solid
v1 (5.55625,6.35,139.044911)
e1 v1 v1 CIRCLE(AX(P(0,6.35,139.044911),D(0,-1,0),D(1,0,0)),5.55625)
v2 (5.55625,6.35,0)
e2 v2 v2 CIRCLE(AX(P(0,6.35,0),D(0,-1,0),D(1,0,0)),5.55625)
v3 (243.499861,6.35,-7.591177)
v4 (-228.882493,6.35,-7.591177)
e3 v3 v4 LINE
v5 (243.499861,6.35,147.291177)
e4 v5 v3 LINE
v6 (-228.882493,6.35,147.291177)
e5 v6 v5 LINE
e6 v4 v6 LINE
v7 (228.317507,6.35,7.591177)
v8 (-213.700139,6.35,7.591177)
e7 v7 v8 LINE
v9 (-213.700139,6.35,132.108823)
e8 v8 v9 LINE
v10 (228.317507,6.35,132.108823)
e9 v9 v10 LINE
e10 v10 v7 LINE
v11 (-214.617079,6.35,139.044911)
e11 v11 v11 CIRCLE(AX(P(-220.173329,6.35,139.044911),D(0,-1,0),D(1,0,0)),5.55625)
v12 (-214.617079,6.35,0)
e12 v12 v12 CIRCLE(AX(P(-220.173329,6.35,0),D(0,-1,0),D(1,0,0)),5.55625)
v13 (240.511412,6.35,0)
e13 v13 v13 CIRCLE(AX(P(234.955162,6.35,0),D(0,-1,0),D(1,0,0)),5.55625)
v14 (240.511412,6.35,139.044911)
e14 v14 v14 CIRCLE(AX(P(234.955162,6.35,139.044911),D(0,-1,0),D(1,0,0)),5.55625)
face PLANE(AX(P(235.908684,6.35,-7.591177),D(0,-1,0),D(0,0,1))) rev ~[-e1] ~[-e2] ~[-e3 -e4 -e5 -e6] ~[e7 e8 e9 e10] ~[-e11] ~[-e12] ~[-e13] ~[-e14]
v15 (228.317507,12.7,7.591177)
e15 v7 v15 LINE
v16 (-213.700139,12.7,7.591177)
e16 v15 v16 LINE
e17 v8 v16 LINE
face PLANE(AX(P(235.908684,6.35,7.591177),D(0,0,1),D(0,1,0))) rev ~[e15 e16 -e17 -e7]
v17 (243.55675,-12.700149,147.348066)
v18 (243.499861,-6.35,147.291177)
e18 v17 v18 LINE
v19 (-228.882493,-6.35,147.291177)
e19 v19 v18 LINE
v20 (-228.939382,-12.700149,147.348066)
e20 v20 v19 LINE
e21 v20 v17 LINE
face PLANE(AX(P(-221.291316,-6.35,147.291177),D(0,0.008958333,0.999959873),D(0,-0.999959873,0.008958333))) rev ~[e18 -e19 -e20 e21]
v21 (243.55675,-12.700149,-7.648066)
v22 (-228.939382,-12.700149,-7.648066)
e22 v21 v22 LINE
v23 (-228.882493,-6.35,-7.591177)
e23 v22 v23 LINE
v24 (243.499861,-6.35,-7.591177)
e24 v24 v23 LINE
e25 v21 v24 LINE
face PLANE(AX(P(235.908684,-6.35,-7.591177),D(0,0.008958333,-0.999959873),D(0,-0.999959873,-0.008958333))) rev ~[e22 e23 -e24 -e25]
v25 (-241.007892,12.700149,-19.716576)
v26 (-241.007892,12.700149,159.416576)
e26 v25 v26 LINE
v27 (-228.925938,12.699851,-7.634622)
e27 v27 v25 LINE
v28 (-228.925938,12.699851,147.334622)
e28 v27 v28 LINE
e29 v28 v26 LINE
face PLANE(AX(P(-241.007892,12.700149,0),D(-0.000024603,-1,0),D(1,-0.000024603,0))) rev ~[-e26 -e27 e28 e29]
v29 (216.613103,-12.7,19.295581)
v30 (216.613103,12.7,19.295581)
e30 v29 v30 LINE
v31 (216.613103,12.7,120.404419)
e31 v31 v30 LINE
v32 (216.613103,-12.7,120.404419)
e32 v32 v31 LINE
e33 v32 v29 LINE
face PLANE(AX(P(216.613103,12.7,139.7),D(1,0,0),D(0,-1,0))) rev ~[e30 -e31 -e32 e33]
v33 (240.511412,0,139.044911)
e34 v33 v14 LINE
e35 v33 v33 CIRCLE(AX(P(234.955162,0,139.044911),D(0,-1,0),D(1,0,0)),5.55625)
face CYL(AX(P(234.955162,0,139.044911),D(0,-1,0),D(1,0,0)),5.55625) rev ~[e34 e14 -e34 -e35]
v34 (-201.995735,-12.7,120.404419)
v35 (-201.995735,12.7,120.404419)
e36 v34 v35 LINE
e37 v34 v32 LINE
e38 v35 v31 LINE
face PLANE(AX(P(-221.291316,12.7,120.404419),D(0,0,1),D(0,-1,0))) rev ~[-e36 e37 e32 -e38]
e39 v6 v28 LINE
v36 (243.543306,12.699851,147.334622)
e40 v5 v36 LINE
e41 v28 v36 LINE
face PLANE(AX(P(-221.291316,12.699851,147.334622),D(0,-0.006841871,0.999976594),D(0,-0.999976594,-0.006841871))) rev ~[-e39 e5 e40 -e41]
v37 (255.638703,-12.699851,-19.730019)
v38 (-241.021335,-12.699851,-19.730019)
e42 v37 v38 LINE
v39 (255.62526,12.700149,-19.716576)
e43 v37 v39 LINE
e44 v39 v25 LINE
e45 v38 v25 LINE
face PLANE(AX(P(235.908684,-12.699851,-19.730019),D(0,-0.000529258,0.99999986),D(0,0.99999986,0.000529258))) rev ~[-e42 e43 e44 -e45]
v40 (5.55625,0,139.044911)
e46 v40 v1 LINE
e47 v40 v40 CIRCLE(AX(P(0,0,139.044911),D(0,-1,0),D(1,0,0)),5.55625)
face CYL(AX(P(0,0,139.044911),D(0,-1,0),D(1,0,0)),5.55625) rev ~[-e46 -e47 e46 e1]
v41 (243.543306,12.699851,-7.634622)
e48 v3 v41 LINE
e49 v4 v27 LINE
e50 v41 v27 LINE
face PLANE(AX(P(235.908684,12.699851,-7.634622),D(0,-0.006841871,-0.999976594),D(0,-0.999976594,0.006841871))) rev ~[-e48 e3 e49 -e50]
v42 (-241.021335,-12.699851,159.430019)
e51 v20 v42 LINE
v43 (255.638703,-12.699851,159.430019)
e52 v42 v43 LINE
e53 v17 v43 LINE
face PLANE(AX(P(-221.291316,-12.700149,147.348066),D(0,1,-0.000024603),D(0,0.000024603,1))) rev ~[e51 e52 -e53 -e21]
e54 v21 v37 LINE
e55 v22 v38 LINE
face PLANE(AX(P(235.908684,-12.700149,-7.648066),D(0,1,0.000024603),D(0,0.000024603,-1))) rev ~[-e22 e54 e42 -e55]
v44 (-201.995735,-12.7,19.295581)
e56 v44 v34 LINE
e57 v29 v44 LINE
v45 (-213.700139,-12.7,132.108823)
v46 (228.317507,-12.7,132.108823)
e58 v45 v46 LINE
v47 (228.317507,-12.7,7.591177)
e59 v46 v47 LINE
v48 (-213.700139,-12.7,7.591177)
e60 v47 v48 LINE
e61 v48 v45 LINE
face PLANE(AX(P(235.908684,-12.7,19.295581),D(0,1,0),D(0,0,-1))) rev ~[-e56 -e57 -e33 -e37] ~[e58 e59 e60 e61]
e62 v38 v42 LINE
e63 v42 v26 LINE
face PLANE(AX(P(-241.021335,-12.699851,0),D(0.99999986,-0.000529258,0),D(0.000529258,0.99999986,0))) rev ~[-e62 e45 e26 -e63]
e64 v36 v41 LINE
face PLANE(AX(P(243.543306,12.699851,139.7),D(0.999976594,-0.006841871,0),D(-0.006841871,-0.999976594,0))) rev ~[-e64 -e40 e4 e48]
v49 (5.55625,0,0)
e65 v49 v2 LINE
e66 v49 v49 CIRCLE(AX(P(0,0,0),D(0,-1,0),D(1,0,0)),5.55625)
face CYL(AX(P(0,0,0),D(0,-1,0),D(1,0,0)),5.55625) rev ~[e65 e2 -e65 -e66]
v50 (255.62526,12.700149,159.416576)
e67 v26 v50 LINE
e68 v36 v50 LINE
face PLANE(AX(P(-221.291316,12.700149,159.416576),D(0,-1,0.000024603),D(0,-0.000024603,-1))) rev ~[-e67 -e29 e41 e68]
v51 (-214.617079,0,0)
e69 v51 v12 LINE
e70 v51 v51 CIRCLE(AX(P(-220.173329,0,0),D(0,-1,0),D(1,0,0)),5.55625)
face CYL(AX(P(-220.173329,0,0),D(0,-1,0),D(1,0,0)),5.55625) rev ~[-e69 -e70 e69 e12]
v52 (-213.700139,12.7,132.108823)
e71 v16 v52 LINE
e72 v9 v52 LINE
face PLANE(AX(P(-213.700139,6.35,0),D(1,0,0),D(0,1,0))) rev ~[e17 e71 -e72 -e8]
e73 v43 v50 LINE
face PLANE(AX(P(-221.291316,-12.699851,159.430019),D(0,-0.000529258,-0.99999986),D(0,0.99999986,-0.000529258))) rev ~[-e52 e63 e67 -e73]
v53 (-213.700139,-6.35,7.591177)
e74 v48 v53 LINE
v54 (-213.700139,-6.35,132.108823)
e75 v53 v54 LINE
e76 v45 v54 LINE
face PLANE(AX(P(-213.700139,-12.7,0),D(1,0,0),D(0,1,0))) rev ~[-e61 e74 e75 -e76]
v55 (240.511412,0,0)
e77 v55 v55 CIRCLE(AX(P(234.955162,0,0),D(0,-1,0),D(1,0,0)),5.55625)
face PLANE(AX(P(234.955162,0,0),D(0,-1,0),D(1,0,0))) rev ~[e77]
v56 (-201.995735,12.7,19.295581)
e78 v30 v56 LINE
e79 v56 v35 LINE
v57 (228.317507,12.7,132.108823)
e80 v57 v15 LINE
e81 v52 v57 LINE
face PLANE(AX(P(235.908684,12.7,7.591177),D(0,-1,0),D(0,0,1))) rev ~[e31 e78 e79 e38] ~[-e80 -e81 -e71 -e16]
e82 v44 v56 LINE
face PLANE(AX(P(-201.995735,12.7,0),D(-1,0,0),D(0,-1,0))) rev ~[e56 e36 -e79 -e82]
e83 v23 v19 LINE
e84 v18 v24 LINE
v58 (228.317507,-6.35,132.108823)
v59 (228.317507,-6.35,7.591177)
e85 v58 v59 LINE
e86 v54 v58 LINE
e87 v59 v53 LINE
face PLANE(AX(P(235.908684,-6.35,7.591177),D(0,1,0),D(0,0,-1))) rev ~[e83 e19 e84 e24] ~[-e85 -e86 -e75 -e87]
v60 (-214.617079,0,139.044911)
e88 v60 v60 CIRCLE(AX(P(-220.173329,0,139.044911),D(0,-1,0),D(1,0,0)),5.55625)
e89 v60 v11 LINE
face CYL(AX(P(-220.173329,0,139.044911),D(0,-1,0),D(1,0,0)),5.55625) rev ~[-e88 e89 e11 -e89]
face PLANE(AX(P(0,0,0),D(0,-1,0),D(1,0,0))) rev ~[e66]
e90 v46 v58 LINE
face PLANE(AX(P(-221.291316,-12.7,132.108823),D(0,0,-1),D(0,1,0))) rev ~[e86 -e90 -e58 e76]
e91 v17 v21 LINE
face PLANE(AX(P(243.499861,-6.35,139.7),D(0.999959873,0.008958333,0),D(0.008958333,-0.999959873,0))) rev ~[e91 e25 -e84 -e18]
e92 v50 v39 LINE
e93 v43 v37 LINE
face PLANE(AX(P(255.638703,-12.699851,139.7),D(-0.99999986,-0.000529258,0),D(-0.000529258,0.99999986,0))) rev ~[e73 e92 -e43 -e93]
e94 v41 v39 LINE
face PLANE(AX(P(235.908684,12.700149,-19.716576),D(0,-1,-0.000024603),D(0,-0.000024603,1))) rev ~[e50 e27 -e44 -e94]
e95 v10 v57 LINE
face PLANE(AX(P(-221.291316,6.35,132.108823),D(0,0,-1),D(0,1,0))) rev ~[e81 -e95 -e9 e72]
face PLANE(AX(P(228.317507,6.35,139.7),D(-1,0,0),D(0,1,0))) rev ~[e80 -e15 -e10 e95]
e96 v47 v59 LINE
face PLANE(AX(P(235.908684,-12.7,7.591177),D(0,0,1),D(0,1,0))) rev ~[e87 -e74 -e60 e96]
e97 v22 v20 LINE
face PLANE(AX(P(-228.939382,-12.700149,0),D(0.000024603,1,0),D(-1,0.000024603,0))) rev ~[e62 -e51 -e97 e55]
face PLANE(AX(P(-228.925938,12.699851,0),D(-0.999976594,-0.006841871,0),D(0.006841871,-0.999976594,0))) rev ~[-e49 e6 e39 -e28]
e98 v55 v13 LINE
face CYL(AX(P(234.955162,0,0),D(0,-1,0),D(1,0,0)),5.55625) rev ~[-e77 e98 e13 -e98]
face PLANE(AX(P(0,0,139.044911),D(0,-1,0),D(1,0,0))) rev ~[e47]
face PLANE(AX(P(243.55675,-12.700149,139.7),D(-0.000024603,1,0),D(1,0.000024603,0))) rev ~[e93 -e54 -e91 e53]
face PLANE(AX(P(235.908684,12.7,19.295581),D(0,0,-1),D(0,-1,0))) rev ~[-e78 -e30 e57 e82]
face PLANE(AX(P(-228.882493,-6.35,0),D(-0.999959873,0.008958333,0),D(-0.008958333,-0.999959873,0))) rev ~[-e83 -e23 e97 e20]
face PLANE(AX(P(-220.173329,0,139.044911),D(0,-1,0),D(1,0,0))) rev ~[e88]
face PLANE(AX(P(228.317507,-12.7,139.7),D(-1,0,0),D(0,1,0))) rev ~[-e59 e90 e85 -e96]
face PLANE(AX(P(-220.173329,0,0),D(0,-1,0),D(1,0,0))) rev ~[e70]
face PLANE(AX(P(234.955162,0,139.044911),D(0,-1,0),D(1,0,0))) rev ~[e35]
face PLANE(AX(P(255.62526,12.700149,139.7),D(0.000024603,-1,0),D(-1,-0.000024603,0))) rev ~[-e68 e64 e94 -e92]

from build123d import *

# Parameters (mm, degrees)
F4_D     = 11.1125
F4_DEPTH = 12.7011486273


# Not quite as in the source:
# - a length typed as a fraction of an inch, garbled in the dataset ("3 / 203.2 mm" for 3/8 in), is restored


with BuildPart() as f2:
    # F2: sweep along a path in F1
    with BuildLine(Plane.XZ) as f2_path:
        Line((235.9086840398, 0), (0, 0))
        Line((0, 0), (-221.2913159602, 0))
        Line((-221.2913159602, 0), (-221.2913159602, 139.7))
        Line((-221.2913159602, 139.7), (235.9086840398, 139.7))
        Line((235.9086840398, 139.7), (235.9086840398, 0))
    # F0 (on Right) → F2 (sweep)
    with BuildSketch(Plane.YZ):
        Polygon((-6.35, 7.5911765571), (-6.35, -7.5911765571), (-12.7001486273, -7.648065583), (-12.6998513727, -19.7300187742), (12.7001486273, -19.7165756275), (12.6998513727, -7.6346224362), (6.35, -7.5911765571), (6.35, 7.5911765571), (12.7, 7.5911765571), (12.7, 19.2955805858), (-12.7, 19.2955805858), (-12.7, 7.5911765571), align=None)
    sweep(path=f2_path.line, transition=Transition.RIGHT)

    # F4 (through all, one way)
    with BuildSketch(Plane.XZ):
        with Locations((-220.1733291149, 139.0449106693), (-220.1733291149, 0), (0, 139.0449106693), (0, 0), (234.9551618099, 139.0449106693), (234.9551618099, 0)):
            Circle(F4_D / 2)
    extrude(amount=-F4_DEPTH, mode=Mode.SUBTRACT)


solid = f2.part
